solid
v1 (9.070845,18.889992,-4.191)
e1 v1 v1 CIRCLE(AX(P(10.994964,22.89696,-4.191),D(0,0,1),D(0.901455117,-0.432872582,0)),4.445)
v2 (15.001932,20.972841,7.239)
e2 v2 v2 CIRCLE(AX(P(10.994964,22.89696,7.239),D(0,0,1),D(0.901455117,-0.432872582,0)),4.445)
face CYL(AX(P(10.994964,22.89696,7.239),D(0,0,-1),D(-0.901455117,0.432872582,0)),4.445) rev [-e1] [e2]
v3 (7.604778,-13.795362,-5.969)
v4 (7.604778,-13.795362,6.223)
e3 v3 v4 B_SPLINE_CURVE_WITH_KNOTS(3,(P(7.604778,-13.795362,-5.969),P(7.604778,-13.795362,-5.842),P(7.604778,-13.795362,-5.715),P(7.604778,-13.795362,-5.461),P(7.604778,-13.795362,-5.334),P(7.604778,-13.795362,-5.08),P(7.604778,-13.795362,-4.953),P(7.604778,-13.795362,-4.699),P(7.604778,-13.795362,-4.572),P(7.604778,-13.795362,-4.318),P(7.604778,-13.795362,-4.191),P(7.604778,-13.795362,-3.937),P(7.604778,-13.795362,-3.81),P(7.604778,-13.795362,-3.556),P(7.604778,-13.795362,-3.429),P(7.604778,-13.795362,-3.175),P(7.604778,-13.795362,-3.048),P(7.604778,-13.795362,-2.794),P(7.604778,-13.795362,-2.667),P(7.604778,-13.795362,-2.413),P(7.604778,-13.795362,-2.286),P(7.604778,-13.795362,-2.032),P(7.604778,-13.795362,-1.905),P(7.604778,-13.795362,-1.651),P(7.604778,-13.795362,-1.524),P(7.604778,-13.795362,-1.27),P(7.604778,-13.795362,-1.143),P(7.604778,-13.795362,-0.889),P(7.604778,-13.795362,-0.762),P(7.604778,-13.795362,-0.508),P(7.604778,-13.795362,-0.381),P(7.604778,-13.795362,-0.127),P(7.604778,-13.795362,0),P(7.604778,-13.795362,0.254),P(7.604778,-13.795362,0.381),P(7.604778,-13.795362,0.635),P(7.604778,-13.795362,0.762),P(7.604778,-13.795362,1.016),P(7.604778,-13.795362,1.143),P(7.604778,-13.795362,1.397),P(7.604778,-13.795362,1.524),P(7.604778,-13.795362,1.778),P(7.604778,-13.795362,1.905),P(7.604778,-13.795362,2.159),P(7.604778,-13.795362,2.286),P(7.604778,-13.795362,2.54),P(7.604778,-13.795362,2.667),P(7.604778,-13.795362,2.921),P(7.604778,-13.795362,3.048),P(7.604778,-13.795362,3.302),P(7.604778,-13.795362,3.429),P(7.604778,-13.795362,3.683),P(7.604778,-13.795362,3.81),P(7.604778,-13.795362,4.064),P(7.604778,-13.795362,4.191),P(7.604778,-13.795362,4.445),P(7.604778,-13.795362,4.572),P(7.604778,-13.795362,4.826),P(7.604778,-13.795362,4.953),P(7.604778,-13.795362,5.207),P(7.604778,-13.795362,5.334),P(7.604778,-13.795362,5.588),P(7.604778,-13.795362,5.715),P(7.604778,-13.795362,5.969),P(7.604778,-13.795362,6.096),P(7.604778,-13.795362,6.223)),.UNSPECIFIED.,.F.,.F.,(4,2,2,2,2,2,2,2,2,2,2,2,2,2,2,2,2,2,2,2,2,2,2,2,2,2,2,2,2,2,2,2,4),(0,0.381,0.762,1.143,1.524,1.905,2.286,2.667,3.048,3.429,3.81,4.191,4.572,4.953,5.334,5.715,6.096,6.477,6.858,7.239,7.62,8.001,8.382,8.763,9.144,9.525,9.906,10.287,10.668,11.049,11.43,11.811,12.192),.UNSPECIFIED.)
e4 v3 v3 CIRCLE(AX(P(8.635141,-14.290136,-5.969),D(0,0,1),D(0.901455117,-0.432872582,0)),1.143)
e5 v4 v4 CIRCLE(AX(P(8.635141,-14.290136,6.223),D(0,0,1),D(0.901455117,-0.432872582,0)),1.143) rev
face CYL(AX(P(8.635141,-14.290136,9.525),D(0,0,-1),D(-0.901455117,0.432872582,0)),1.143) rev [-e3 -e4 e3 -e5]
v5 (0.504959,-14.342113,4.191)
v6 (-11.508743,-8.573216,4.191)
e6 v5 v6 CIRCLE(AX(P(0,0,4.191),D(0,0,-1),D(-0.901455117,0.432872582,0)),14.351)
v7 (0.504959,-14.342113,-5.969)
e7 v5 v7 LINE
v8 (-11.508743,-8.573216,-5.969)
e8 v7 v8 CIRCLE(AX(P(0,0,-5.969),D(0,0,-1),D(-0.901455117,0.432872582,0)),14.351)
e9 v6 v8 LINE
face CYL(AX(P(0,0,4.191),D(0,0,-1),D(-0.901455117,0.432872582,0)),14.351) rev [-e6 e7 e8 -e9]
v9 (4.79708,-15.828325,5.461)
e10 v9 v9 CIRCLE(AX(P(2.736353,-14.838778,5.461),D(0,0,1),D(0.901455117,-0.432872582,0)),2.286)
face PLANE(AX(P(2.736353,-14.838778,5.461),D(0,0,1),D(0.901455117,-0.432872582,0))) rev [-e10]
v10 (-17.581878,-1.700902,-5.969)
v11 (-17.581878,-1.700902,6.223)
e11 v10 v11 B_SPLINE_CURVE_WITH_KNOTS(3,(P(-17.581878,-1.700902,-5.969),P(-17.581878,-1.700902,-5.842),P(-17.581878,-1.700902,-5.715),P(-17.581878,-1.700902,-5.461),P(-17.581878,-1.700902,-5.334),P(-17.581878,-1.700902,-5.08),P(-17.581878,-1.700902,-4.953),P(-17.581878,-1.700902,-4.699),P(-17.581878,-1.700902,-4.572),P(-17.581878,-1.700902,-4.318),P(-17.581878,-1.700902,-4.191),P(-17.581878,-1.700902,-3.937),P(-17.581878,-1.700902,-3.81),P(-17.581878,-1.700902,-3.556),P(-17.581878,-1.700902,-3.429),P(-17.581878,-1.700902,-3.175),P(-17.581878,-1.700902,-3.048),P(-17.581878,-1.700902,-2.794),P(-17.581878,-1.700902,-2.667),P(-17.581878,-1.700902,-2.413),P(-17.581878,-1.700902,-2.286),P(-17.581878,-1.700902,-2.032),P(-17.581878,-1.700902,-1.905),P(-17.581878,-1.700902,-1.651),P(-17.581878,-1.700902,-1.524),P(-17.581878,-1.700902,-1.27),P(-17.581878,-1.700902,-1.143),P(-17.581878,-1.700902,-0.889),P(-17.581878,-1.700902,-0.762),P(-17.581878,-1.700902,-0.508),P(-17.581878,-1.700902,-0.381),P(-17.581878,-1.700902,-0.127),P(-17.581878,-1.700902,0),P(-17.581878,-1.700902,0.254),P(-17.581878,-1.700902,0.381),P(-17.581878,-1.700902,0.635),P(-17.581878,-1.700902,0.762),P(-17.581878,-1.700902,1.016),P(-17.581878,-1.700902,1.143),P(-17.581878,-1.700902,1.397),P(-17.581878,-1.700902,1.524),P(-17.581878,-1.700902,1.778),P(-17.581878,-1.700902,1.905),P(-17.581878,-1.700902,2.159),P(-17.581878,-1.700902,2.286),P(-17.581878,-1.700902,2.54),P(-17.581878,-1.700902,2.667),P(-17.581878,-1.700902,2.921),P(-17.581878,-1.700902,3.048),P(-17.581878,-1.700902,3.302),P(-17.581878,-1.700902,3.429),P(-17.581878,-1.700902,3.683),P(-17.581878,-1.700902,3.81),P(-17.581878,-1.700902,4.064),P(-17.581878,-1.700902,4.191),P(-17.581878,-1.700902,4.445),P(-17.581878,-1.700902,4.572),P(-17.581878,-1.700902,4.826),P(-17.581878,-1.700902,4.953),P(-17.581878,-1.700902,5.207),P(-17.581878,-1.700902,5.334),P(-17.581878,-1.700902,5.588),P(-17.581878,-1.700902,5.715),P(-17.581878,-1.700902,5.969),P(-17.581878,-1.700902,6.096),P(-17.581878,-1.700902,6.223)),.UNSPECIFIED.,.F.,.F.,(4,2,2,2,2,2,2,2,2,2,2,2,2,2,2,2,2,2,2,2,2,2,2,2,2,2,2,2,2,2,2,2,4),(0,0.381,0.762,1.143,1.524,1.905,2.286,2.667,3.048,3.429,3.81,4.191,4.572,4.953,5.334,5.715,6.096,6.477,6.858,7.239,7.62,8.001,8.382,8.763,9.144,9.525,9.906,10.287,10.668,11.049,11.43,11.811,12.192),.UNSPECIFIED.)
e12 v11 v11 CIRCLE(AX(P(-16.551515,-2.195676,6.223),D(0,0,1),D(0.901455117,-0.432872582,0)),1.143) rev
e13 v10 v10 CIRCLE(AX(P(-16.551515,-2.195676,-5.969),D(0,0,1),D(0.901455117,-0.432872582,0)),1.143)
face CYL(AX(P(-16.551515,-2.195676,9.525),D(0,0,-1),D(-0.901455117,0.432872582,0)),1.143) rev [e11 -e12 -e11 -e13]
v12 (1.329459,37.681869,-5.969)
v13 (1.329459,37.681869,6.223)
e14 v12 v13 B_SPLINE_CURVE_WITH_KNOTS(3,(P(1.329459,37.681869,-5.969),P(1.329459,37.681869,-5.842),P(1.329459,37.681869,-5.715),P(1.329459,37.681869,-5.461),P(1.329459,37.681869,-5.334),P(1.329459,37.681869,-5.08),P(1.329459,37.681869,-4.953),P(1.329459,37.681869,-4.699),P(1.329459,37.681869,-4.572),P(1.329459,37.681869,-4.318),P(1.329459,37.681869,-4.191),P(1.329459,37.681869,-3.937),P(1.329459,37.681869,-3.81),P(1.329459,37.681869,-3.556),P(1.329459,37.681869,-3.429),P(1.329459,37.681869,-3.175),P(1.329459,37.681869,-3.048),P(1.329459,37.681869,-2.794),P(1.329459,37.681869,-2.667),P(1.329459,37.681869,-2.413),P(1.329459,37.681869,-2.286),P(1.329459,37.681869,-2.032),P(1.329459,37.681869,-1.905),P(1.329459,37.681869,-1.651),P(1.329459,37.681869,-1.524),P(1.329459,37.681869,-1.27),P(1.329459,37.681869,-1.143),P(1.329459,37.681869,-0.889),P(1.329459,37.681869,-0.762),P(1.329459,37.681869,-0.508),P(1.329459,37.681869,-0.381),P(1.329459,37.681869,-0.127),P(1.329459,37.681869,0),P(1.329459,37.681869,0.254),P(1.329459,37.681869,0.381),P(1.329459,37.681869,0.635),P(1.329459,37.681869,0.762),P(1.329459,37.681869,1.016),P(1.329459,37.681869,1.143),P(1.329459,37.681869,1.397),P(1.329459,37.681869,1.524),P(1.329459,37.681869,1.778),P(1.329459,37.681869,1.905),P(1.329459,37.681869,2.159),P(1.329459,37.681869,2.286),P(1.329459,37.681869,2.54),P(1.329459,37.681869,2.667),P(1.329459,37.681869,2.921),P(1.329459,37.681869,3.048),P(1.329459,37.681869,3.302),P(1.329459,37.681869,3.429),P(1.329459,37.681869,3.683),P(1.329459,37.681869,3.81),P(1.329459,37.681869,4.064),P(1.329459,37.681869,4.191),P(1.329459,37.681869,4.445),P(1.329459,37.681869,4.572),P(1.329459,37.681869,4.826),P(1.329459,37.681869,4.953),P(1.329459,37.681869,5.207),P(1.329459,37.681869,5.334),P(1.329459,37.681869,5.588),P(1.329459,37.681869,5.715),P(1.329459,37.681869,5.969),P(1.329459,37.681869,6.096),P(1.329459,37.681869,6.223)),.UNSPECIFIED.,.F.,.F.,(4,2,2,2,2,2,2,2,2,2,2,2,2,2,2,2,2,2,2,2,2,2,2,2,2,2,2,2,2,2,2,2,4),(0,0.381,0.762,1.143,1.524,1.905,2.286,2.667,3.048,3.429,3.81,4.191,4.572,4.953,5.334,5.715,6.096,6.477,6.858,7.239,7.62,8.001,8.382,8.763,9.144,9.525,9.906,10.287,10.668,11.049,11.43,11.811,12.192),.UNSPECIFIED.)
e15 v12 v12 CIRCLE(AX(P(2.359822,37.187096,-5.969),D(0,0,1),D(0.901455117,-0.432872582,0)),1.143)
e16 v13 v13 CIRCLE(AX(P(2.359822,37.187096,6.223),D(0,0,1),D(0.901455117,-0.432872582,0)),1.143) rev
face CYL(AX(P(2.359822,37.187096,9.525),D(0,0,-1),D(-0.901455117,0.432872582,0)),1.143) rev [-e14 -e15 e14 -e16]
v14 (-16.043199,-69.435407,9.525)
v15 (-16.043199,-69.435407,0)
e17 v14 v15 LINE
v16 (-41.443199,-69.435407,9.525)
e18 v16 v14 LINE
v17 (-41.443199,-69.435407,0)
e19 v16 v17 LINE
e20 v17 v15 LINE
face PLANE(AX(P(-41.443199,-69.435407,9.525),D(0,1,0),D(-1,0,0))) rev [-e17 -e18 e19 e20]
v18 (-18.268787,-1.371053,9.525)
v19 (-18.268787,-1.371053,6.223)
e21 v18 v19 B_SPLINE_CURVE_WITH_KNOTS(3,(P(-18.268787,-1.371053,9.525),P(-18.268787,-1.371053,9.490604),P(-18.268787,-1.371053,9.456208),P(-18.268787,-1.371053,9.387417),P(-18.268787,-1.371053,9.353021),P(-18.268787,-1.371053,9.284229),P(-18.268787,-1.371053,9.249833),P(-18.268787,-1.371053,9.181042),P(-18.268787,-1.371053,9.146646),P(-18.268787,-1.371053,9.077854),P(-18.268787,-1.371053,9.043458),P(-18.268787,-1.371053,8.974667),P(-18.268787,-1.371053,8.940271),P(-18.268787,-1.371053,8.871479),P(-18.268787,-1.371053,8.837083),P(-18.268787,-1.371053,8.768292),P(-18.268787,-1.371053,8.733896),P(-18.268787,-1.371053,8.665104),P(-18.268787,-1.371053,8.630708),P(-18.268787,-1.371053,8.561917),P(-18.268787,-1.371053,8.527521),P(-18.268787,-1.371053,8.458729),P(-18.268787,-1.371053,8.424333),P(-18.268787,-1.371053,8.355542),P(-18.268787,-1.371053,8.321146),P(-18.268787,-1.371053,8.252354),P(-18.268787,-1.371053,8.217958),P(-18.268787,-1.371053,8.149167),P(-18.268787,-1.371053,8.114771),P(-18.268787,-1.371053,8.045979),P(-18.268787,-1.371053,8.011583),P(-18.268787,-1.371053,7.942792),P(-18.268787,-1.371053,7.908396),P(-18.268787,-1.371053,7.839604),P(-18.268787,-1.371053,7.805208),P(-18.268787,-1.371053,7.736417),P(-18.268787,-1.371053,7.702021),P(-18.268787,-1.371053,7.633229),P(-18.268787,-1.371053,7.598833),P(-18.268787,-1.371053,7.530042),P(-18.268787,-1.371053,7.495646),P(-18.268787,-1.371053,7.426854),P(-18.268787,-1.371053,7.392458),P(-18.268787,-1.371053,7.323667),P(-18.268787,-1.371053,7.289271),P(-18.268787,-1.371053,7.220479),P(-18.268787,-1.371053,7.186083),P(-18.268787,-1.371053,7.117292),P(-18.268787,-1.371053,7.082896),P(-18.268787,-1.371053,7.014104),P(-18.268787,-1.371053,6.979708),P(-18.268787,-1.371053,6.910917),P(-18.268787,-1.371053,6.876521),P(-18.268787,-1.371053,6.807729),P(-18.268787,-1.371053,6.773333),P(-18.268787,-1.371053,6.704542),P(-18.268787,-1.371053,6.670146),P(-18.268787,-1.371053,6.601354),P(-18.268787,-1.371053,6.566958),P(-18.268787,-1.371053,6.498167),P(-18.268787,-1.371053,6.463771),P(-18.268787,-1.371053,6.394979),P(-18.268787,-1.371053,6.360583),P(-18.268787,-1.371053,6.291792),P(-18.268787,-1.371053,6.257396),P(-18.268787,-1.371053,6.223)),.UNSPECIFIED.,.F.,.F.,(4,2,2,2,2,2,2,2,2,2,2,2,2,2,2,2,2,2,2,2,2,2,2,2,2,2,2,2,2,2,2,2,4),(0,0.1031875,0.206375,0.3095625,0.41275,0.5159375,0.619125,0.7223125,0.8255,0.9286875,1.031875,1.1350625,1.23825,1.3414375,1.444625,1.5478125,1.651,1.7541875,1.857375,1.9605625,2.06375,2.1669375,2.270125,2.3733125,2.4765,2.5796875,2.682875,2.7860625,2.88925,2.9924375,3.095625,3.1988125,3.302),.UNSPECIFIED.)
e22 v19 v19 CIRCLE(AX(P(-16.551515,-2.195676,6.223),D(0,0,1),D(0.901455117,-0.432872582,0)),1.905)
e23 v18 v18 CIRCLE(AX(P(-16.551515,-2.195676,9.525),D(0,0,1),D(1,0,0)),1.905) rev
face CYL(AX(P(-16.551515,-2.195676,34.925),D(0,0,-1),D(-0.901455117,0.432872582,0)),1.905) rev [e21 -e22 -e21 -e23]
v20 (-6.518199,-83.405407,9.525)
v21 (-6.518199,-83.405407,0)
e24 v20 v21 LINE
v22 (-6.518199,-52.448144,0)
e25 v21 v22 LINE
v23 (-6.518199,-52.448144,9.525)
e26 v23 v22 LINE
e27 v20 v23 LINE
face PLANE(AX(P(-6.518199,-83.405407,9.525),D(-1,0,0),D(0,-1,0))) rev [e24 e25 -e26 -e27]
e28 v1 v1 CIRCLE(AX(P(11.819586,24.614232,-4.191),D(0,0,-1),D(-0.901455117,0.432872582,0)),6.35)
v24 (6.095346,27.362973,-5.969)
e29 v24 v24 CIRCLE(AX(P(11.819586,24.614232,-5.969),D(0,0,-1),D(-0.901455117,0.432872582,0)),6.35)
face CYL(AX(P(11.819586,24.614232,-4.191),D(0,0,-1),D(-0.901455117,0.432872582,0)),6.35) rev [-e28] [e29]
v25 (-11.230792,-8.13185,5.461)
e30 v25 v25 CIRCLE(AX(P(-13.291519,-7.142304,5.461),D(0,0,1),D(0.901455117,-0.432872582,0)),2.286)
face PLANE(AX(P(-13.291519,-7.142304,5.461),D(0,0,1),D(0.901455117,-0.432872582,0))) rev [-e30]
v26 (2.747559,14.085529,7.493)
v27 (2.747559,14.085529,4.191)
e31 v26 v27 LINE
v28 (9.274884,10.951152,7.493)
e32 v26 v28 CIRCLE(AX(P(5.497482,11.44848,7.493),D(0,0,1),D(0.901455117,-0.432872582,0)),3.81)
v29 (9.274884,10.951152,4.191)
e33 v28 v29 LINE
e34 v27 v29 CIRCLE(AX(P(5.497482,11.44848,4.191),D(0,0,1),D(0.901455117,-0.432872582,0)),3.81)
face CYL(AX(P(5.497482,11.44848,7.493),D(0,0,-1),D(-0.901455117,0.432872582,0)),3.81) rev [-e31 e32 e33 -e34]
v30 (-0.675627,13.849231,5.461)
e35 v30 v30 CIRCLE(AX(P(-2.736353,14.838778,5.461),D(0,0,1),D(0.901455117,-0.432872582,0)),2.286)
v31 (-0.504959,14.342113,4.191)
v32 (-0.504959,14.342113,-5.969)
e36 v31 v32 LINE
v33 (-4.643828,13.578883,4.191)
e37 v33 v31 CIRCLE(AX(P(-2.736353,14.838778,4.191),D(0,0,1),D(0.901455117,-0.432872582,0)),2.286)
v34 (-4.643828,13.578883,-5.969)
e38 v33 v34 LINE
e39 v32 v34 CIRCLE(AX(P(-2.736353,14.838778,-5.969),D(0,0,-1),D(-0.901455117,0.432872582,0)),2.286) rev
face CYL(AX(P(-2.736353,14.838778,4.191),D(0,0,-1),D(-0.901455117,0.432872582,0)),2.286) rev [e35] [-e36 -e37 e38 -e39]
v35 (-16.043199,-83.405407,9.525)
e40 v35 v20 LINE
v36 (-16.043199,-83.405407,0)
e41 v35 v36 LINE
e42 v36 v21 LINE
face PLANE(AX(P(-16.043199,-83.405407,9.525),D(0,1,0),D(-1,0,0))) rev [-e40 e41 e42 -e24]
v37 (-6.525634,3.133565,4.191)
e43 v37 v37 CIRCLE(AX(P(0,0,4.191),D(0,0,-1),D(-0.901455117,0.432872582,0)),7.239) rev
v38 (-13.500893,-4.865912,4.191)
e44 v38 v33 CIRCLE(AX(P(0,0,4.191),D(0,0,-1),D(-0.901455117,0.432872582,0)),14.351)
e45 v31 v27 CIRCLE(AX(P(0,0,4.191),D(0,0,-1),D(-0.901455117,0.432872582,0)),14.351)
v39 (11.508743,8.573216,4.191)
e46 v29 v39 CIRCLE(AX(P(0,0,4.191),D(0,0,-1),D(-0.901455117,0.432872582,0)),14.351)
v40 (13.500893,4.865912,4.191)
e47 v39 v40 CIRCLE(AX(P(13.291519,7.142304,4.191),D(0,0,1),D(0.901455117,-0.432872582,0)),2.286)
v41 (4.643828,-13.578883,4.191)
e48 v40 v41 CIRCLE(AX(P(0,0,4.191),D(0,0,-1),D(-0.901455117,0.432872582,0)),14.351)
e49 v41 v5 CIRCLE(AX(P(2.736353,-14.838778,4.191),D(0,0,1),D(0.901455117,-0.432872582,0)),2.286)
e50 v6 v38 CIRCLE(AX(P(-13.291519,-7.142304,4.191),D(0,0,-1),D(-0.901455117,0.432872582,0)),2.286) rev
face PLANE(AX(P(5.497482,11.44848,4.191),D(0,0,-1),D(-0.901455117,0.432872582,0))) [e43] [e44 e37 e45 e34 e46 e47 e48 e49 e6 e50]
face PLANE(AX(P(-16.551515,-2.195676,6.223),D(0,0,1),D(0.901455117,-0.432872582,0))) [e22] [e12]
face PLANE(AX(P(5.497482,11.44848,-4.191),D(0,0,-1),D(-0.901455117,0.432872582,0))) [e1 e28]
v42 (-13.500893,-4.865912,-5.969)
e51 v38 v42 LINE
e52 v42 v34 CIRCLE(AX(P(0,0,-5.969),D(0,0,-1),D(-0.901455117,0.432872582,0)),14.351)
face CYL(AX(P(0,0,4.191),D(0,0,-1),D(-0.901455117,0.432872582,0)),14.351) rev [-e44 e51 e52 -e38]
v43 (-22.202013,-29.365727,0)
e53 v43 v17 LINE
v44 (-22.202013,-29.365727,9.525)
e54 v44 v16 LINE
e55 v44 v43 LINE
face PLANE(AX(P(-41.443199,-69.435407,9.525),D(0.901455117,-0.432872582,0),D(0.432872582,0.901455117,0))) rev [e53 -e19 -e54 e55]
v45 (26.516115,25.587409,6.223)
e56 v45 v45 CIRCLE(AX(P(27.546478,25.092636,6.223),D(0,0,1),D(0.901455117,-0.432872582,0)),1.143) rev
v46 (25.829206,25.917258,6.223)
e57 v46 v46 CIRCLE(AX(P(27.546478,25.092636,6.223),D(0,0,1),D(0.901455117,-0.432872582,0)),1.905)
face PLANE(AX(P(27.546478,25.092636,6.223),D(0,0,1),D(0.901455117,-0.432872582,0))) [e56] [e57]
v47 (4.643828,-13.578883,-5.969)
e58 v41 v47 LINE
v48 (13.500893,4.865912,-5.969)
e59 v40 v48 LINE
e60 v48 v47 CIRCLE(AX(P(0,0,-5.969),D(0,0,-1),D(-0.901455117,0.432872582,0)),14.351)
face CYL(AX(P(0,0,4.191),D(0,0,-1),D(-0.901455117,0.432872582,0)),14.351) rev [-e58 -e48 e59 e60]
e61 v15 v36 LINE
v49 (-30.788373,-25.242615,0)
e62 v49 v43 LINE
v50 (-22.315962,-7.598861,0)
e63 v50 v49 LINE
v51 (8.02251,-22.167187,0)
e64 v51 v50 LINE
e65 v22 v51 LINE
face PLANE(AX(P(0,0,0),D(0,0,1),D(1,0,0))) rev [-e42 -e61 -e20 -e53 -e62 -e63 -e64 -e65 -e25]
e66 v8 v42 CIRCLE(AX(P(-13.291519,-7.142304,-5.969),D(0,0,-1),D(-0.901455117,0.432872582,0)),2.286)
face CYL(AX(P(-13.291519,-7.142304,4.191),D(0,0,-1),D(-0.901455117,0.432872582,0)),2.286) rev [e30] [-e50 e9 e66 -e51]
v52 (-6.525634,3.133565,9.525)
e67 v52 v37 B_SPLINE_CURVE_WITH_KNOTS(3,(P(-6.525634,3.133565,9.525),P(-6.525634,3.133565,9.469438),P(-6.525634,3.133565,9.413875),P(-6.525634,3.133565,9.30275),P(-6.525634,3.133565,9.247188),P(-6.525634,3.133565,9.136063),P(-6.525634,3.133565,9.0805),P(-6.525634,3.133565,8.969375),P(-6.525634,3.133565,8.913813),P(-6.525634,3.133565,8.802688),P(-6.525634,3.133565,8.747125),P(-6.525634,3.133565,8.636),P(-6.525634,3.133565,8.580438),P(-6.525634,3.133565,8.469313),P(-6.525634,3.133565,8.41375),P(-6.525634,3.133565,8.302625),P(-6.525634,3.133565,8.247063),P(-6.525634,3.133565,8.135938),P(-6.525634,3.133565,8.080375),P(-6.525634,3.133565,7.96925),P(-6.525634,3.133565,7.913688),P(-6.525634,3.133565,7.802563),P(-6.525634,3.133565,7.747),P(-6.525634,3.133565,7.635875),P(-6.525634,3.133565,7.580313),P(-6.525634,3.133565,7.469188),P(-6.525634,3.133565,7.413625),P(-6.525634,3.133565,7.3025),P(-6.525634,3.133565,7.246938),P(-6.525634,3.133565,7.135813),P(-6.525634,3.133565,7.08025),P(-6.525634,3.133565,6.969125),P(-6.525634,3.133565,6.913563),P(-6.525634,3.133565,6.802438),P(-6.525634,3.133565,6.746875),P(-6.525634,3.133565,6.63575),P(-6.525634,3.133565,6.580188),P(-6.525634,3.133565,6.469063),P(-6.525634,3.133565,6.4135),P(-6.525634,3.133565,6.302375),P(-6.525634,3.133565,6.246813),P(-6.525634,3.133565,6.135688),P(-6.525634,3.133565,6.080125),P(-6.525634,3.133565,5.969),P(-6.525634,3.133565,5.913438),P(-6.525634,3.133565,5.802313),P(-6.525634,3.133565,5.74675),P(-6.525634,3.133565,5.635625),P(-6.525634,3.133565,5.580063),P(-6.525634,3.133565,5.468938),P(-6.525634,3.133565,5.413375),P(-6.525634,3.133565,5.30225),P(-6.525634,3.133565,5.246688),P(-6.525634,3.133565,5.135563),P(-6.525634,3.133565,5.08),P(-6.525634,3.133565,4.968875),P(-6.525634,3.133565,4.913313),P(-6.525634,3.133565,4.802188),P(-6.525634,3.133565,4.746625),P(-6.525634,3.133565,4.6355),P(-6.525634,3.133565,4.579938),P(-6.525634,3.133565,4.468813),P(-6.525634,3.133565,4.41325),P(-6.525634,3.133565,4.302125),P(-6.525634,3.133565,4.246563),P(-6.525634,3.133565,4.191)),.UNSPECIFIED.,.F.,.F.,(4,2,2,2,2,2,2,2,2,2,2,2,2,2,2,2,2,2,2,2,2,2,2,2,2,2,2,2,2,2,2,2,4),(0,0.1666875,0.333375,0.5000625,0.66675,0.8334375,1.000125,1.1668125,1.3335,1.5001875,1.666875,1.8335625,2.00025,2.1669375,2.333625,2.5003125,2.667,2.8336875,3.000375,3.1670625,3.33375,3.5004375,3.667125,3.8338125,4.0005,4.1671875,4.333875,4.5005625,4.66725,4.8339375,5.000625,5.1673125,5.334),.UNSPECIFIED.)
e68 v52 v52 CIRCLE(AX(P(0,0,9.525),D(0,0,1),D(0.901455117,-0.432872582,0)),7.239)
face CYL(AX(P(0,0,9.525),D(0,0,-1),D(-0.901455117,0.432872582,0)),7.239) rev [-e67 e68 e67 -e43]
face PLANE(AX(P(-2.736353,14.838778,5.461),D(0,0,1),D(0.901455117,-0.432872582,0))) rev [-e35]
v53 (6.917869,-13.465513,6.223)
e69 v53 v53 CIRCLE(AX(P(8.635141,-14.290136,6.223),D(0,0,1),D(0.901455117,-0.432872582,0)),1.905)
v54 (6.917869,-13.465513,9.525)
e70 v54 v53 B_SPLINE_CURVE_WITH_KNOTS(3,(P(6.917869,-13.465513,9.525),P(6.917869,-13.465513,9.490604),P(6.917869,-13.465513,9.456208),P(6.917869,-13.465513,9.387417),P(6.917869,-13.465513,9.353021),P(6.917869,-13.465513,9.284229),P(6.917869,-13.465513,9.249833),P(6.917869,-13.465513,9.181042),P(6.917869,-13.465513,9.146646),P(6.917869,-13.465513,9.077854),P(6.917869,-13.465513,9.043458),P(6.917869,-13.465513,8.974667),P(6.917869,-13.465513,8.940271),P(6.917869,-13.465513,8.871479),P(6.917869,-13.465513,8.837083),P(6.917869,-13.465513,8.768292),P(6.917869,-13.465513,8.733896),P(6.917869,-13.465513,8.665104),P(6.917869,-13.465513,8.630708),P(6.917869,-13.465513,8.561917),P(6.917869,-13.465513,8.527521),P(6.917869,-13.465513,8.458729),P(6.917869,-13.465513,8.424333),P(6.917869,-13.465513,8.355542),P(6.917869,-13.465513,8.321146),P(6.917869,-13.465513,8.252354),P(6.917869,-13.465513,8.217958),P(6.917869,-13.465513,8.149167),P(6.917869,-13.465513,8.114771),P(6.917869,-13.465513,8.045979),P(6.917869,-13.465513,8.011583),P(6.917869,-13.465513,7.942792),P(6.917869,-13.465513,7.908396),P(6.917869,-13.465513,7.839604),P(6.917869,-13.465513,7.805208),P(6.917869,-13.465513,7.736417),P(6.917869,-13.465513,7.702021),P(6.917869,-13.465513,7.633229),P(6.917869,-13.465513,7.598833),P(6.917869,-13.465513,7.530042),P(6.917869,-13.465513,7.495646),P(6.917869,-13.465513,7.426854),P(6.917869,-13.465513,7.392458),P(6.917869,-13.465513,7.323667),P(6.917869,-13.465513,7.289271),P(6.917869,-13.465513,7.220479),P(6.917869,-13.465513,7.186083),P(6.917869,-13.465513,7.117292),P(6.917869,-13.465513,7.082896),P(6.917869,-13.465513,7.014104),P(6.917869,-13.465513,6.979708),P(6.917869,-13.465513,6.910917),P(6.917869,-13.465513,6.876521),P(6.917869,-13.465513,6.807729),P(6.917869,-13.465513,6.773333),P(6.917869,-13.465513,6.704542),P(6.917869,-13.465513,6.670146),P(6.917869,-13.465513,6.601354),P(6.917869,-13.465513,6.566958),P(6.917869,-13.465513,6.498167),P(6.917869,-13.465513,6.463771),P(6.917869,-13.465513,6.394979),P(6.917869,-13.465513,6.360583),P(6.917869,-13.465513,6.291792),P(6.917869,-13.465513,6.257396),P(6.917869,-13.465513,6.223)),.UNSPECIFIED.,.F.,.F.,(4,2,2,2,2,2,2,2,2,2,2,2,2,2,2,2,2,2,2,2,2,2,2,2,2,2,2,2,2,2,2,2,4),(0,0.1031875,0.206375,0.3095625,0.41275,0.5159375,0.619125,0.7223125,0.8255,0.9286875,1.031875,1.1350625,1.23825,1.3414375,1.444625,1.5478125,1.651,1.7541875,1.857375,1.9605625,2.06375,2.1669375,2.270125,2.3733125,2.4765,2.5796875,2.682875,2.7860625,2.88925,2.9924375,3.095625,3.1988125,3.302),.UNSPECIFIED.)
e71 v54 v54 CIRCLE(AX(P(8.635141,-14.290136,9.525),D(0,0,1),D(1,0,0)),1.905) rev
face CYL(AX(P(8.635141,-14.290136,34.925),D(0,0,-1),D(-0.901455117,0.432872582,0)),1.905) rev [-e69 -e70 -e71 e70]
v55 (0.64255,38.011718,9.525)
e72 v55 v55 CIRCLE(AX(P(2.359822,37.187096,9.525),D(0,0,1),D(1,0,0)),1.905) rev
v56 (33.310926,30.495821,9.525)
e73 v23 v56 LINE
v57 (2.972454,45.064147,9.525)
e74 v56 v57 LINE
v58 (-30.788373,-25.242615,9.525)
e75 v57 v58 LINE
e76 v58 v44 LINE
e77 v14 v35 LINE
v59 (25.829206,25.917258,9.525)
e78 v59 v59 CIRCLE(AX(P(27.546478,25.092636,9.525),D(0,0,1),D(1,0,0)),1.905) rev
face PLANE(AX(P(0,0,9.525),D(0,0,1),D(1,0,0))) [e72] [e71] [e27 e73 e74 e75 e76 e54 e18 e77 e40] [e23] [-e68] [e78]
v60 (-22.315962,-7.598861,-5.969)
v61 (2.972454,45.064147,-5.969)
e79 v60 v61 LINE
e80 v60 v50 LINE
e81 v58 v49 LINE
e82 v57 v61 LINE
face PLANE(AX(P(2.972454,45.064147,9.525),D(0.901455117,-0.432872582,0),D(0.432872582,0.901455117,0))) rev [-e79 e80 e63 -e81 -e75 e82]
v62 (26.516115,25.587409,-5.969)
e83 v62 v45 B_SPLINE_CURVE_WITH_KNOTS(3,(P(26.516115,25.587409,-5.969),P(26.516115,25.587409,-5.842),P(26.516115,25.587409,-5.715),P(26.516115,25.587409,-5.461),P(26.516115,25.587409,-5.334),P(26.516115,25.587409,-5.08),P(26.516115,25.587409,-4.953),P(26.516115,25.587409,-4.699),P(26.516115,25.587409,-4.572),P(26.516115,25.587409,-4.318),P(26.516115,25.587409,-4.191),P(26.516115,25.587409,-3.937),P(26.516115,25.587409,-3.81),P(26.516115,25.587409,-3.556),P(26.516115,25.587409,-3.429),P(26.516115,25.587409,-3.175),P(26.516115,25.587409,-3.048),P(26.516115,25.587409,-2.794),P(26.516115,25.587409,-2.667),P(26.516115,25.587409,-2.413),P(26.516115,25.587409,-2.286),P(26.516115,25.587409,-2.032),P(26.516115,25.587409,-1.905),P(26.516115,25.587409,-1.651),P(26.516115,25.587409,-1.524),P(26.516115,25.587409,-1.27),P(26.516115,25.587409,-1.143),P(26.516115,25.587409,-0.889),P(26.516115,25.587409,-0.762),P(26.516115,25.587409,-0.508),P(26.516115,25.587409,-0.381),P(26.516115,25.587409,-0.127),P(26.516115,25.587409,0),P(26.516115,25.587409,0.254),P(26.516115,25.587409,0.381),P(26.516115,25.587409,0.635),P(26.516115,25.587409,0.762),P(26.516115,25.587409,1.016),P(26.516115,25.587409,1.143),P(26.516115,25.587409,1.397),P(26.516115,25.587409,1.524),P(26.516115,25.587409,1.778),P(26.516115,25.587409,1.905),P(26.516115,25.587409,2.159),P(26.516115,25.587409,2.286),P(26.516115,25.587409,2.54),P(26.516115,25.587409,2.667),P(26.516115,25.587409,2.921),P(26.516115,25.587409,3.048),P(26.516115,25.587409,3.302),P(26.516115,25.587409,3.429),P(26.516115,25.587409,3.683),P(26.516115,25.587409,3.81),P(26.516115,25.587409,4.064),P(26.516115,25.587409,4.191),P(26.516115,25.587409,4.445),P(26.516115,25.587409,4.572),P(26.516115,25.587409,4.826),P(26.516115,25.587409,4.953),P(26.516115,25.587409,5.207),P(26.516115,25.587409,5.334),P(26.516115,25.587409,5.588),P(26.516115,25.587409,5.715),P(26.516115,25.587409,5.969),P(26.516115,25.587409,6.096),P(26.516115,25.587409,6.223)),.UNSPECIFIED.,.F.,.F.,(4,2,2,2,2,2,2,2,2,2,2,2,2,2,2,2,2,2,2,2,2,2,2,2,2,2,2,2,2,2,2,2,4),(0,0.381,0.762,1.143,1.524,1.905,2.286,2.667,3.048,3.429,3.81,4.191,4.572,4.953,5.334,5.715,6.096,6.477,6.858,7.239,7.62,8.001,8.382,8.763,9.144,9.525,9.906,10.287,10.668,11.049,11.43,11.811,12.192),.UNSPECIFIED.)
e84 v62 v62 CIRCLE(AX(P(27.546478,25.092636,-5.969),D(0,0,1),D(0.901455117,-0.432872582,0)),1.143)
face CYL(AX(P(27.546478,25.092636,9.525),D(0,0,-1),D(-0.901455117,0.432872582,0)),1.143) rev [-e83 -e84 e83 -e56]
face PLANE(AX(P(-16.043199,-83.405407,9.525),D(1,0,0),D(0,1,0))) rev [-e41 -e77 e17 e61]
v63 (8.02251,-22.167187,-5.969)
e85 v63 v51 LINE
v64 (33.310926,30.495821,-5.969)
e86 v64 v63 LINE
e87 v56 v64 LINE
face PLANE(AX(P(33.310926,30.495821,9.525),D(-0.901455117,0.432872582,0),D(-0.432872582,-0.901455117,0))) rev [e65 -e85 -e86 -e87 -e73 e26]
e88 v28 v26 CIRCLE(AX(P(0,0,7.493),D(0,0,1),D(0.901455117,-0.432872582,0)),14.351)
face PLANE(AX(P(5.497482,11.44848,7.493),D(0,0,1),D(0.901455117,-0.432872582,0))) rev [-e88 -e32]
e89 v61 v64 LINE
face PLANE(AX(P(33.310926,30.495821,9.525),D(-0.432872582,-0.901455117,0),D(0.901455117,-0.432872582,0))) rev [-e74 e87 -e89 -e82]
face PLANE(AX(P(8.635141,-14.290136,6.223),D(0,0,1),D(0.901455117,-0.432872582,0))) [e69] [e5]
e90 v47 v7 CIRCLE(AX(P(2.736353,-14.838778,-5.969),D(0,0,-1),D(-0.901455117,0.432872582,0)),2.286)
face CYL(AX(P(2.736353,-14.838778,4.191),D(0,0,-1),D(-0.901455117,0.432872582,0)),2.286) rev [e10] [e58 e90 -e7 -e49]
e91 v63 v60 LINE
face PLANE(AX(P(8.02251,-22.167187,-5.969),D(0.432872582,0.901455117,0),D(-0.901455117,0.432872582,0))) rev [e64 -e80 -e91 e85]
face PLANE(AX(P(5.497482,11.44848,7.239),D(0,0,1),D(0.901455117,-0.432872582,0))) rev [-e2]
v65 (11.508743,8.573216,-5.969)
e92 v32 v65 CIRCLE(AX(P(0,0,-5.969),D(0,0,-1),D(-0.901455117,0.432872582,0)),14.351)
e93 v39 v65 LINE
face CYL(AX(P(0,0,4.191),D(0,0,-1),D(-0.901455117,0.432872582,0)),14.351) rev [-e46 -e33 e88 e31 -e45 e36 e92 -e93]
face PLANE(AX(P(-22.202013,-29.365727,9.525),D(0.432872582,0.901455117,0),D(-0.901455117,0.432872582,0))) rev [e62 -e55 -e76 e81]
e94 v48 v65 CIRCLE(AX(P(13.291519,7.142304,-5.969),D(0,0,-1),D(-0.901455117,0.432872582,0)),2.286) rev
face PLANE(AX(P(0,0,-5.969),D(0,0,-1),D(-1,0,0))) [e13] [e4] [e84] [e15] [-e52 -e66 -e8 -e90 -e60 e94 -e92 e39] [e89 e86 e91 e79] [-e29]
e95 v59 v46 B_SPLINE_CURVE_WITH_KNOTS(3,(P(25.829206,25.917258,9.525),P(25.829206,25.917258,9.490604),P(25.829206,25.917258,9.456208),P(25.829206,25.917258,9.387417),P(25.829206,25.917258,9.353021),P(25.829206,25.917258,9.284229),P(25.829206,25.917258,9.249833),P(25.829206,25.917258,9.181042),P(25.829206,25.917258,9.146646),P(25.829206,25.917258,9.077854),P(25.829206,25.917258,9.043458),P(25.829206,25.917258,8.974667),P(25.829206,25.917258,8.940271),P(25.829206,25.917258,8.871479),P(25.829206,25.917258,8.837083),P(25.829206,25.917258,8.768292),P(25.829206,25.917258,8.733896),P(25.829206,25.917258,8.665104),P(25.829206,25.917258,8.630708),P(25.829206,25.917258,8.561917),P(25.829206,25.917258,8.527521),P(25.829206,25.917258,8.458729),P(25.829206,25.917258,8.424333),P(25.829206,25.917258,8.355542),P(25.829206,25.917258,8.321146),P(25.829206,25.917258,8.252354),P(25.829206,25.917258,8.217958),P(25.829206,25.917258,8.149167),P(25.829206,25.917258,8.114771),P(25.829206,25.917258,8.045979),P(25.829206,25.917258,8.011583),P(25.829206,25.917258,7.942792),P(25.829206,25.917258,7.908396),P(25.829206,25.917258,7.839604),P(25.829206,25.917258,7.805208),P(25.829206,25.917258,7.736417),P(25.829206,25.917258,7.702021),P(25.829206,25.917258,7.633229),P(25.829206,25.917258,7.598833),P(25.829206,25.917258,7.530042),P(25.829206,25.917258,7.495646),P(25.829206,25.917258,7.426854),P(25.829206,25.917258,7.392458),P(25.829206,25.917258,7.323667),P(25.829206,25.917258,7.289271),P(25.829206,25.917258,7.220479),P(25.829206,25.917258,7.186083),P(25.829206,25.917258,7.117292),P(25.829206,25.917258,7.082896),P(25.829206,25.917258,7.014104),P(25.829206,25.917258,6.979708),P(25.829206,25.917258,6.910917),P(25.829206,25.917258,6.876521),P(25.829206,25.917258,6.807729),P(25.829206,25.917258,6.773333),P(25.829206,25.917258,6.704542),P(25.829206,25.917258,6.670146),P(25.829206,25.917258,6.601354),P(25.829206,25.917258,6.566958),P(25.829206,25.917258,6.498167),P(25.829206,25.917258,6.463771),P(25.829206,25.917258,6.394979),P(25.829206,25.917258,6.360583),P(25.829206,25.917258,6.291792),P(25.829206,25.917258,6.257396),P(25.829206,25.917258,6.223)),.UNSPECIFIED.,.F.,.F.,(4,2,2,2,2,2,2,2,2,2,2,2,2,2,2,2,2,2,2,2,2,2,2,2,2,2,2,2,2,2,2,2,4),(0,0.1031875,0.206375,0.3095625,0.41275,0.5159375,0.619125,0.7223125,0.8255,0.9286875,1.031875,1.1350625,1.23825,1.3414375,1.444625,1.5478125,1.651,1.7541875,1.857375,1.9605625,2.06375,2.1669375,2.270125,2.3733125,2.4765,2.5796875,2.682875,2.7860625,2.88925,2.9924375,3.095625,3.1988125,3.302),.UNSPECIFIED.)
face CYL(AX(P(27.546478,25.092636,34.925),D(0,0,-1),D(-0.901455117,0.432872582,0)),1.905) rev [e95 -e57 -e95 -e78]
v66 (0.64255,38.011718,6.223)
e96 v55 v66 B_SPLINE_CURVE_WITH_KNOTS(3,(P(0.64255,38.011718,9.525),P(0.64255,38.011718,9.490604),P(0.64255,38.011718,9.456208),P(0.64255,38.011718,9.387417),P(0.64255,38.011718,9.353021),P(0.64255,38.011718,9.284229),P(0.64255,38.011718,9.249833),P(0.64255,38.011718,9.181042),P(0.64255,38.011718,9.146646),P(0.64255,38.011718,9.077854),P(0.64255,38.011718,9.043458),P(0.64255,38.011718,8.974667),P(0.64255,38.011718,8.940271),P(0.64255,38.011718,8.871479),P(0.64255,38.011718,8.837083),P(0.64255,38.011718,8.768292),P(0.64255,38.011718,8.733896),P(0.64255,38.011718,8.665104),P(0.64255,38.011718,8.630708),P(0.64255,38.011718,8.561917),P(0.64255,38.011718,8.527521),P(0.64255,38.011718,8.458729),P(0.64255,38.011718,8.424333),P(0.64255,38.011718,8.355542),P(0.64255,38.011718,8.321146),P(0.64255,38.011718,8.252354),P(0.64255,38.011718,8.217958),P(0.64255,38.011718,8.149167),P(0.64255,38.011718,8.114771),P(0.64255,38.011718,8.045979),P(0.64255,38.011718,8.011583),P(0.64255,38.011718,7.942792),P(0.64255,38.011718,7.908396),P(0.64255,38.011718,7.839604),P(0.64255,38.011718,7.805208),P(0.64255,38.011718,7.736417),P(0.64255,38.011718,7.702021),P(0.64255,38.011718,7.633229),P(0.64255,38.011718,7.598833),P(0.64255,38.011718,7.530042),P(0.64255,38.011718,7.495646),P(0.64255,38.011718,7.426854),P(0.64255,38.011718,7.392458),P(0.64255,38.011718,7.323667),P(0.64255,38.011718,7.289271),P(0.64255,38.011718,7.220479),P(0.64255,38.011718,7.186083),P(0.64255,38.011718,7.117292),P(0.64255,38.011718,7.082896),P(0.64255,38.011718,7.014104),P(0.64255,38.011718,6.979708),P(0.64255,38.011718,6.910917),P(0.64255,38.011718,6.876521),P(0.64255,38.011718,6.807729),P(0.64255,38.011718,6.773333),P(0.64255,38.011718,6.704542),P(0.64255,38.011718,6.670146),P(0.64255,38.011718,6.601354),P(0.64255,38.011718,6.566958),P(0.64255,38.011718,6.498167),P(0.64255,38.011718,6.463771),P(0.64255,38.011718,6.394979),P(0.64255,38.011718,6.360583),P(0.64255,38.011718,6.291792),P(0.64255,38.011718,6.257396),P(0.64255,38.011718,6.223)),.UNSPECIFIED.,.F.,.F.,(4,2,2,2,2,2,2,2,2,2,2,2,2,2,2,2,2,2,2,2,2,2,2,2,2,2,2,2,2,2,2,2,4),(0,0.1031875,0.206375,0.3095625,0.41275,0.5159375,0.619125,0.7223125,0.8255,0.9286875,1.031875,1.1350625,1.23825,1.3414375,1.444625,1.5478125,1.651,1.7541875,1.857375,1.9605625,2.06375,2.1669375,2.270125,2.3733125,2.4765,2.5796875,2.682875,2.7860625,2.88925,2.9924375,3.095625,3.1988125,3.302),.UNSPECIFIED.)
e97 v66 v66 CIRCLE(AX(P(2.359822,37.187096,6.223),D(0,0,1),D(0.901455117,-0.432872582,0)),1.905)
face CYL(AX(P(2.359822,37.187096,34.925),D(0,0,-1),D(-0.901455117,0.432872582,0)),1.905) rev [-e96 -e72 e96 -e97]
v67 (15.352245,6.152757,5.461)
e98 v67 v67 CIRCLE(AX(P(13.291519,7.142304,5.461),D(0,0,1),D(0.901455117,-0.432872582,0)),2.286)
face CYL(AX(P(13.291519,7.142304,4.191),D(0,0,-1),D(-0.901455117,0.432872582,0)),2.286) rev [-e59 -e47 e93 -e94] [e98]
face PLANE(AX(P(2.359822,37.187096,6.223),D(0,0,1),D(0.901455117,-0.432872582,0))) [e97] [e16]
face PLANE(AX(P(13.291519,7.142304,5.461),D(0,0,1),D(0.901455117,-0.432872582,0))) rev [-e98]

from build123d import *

# Parameters (mm, degrees)
BOSS_EXTRUDE1_DEPTH   = 9.525
BOSS_EXTRUDE2_DEPTH   = 5.969
CAVITY1_START         = -5.969
CAVITY1_OUTLINE_R     = 4.445
CAVITY1_OUTLINE_R_2   = 1.143
CAVITY1_DEPTH         = 10.16
CAVITY1_START_2       = 4.191
CAVITY1_2_OUTLINE_R   = 7.239
CAVITY1_2_OUTLINE_R_2 = 1.143
CAVITY1_2_DEPTH       = 5.334
CAVITY1_3_OUTLINE_R   = 4.445
CAVITY1_3_DEPTH       = 3.048
CAVITY1_4_OUTLINE_R   = 6.35
CAVITY1_4_OUTLINE_R_2 = 4.445
CAVITY1_4_DEPTH       = 1.778
CAVITY1_START_3       = 6.223
CAVITY1_5_OUTLINE_R   = 1.905
CAVITY1_5_OUTLINE_R_2 = 1.143
CAVITY1_5_DEPTH       = 3.302
CAVITY1_6_OUTLINE_R   = 2.286
CAVITY1_6_DEPTH       = 1.27
CAVITY1_START_4       = 7.239
CAVITY1_7_DEPTH       = 0.254


# Read off the part's stored shape, not the designer's step: Cavity1
with BuildPart() as part:
    # Sketch1 → Boss-Extrude1 (new body)
    with BuildSketch(Plane.XY):
        Polygon((-41.443198843, -69.435406513), (-16.043198843, -69.435406513), (-16.043198843, -83.405406513), (-6.518198843, -83.405406513), (-6.518198843, -52.448144489), (33.310925875, 30.495820593), (2.972453908, 45.064147324), (-30.788372585, -25.242615218), (-22.202012594, -29.365726557), align=None)
    extrude(amount=BOSS_EXTRUDE1_DEPTH)

    # Sketch2 → Boss-Extrude2 (add)
    with BuildSketch(Plane(origin=(0, 0, 0), x_dir=(-1, 0, 0), z_dir=(0, 0, -1))):
        Polygon((-2.972453908, 45.064147324), (-33.310925875, 30.495820593), (-8.022509662, -22.167187349), (22.315962304, -7.598860618), align=None)
    extrude(amount=BOSS_EXTRUDE2_DEPTH)

    # Cavity1 outline → Cavity1 (cut)
    with BuildSketch(Plane.XY.offset(CAVITY1_START)):
        with BuildLine():
            ThreePointArc((11.508743469, 8.573215544), (6.212154418, 12.936782386), (-0.504959238, 14.342113414))
            ThreePointArc((-0.504959238, 14.342113414), (-3.150914892, 17.086873862), (-4.643828287, 13.578882864))
            ThreePointArc((-4.643828287, 13.578882864), (-12.936782386, 6.212154417), (-13.500892619, -4.86591199))
            ThreePointArc((-13.500892619, -4.86591199), (-15.305202325, -8.224372608), (-11.508743469, -8.573215544))
            ThreePointArc((-11.508743469, -8.573215544), (-6.212154418, -12.936782386), (0.504959238, -14.342113414))
            ThreePointArc((0.504959238, -14.342113414), (3.150914892, -17.086873862), (4.643828287, -13.578882864))
            ThreePointArc((4.643828287, -13.578882864), (12.936782386, -6.212154417), (13.500892619, 4.86591199))
            ThreePointArc((13.500892619, 4.86591199), (15.305202325, 8.224372608), (11.508743469, 8.573215544))
        make_face()
        with Locations((10.994963571, 22.896959975)):
            Circle(CAVITY1_OUTLINE_R)
        with Locations((2.35982247, 37.187095529)):
            Circle(CAVITY1_OUTLINE_R_2)
        with Locations((27.546478442, 25.092635602)):
            Circle(CAVITY1_OUTLINE_R_2)
        with Locations((8.635141101, -14.290135555)):
            Circle(CAVITY1_OUTLINE_R_2)
        with Locations((-16.551514871, -2.195675627)):
            Circle(CAVITY1_OUTLINE_R_2)
    extrude(amount=CAVITY1_DEPTH, mode=Mode.SUBTRACT)

    # Cavity1 2 outline → Cavity1 2 (cut)
    with BuildSketch(Plane.XY.offset(CAVITY1_START_2)):
        Circle(CAVITY1_2_OUTLINE_R)
        with Locations((2.35982247, 37.187095529)):
            Circle(CAVITY1_2_OUTLINE_R_2)
        with Locations((27.546478442, 25.092635602)):
            Circle(CAVITY1_2_OUTLINE_R_2)
        with Locations((8.635141101, -14.290135555)):
            Circle(CAVITY1_2_OUTLINE_R_2)
        with Locations((-16.551514871, -2.195675627)):
            Circle(CAVITY1_2_OUTLINE_R_2)
    extrude(amount=CAVITY1_2_DEPTH, mode=Mode.SUBTRACT)

    # Cavity1 3 outline → Cavity1 3 (cut)
    with BuildSketch(Plane.XY.offset(CAVITY1_START_2)):
        with BuildLine():
            ThreePointArc((2.747559241, 14.085528716), (3.84823725, 8.013935991), (9.274883676, 10.951152168))
            ThreePointArc((9.274883676, 10.951152168), (6.212154418, 12.936782386), (2.747559241, 14.085528716))
        make_face()
        with Locations((10.994963571, 22.896959975)):
            Circle(CAVITY1_3_OUTLINE_R)
    extrude(amount=CAVITY1_3_DEPTH, mode=Mode.SUBTRACT)

    # Cavity1 4 outline → Cavity1 4 (cut)
    with BuildSketch(Plane.XY.offset(CAVITY1_START)):
        with Locations((11.819585838, 24.614231973)):
            Circle(CAVITY1_4_OUTLINE_R)
        with Locations((10.994963571, 22.896959975)):
            Circle(CAVITY1_4_OUTLINE_R_2, mode=Mode.SUBTRACT)
    extrude(amount=CAVITY1_4_DEPTH, mode=Mode.SUBTRACT)

    # Cavity1 5 outline → Cavity1 5 (cut)
    # profile 1 of 4: a face of its own
    with BuildSketch(Plane.XY.offset(CAVITY1_START_3)):
        with Locations((2.35982247, 37.187095529)):
            Circle(CAVITY1_5_OUTLINE_R)
        with Locations((2.35982247, 37.187095529)):
            Circle(CAVITY1_5_OUTLINE_R_2, mode=Mode.SUBTRACT)
    # profile 2 of 4: a face of its own
    with BuildSketch(Plane.XY.offset(CAVITY1_START_3)):
        with Locations((27.546478442, 25.092635602)):
            Circle(CAVITY1_5_OUTLINE_R)
        with Locations((27.546478442, 25.092635602)):
            Circle(CAVITY1_5_OUTLINE_R_2, mode=Mode.SUBTRACT)
    # profile 3 of 4: a face of its own
    with BuildSketch(Plane.XY.offset(CAVITY1_START_3)):
        with Locations((8.635141101, -14.290135555)):
            Circle(CAVITY1_5_OUTLINE_R)
        with Locations((8.635141101, -14.290135555)):
            Circle(CAVITY1_5_OUTLINE_R_2, mode=Mode.SUBTRACT)
    # profile 4 of 4: a face of its own
    with BuildSketch(Plane.XY.offset(CAVITY1_START_3)):
        with Locations((-16.551514871, -2.195675627)):
            Circle(CAVITY1_5_OUTLINE_R)
        with Locations((-16.551514871, -2.195675627)):
            Circle(CAVITY1_5_OUTLINE_R_2, mode=Mode.SUBTRACT)
    extrude(amount=CAVITY1_5_DEPTH, mode=Mode.SUBTRACT)

    # Cavity1 6 outline → Cavity1 6 (cut)
    with BuildSketch(Plane.XY.offset(CAVITY1_START_2)):
        with Locations((13.291518505, 7.142303538)):
            Circle(CAVITY1_6_OUTLINE_R)
        with Locations((-2.736353477, 14.838778038)):
            Circle(CAVITY1_6_OUTLINE_R)
        with Locations((2.736353477, -14.838778038)):
            Circle(CAVITY1_6_OUTLINE_R)
        with Locations((-13.291518505, -7.142303538)):
            Circle(CAVITY1_6_OUTLINE_R)
    extrude(amount=CAVITY1_6_DEPTH, mode=Mode.SUBTRACT)

    # Cavity1 7 outline → Cavity1 7 (cut)
    with BuildSketch(Plane.XY.offset(CAVITY1_START_4)):
        with BuildLine():
            ThreePointArc((2.747559241, 14.085528716), (3.84823725, 8.013935991), (9.274883676, 10.951152168))
            ThreePointArc((9.274883676, 10.951152168), (6.212154418, 12.936782386), (2.747559241, 14.085528716))
        make_face()
    extrude(amount=CAVITY1_7_DEPTH, mode=Mode.SUBTRACT)


solid = part.part
